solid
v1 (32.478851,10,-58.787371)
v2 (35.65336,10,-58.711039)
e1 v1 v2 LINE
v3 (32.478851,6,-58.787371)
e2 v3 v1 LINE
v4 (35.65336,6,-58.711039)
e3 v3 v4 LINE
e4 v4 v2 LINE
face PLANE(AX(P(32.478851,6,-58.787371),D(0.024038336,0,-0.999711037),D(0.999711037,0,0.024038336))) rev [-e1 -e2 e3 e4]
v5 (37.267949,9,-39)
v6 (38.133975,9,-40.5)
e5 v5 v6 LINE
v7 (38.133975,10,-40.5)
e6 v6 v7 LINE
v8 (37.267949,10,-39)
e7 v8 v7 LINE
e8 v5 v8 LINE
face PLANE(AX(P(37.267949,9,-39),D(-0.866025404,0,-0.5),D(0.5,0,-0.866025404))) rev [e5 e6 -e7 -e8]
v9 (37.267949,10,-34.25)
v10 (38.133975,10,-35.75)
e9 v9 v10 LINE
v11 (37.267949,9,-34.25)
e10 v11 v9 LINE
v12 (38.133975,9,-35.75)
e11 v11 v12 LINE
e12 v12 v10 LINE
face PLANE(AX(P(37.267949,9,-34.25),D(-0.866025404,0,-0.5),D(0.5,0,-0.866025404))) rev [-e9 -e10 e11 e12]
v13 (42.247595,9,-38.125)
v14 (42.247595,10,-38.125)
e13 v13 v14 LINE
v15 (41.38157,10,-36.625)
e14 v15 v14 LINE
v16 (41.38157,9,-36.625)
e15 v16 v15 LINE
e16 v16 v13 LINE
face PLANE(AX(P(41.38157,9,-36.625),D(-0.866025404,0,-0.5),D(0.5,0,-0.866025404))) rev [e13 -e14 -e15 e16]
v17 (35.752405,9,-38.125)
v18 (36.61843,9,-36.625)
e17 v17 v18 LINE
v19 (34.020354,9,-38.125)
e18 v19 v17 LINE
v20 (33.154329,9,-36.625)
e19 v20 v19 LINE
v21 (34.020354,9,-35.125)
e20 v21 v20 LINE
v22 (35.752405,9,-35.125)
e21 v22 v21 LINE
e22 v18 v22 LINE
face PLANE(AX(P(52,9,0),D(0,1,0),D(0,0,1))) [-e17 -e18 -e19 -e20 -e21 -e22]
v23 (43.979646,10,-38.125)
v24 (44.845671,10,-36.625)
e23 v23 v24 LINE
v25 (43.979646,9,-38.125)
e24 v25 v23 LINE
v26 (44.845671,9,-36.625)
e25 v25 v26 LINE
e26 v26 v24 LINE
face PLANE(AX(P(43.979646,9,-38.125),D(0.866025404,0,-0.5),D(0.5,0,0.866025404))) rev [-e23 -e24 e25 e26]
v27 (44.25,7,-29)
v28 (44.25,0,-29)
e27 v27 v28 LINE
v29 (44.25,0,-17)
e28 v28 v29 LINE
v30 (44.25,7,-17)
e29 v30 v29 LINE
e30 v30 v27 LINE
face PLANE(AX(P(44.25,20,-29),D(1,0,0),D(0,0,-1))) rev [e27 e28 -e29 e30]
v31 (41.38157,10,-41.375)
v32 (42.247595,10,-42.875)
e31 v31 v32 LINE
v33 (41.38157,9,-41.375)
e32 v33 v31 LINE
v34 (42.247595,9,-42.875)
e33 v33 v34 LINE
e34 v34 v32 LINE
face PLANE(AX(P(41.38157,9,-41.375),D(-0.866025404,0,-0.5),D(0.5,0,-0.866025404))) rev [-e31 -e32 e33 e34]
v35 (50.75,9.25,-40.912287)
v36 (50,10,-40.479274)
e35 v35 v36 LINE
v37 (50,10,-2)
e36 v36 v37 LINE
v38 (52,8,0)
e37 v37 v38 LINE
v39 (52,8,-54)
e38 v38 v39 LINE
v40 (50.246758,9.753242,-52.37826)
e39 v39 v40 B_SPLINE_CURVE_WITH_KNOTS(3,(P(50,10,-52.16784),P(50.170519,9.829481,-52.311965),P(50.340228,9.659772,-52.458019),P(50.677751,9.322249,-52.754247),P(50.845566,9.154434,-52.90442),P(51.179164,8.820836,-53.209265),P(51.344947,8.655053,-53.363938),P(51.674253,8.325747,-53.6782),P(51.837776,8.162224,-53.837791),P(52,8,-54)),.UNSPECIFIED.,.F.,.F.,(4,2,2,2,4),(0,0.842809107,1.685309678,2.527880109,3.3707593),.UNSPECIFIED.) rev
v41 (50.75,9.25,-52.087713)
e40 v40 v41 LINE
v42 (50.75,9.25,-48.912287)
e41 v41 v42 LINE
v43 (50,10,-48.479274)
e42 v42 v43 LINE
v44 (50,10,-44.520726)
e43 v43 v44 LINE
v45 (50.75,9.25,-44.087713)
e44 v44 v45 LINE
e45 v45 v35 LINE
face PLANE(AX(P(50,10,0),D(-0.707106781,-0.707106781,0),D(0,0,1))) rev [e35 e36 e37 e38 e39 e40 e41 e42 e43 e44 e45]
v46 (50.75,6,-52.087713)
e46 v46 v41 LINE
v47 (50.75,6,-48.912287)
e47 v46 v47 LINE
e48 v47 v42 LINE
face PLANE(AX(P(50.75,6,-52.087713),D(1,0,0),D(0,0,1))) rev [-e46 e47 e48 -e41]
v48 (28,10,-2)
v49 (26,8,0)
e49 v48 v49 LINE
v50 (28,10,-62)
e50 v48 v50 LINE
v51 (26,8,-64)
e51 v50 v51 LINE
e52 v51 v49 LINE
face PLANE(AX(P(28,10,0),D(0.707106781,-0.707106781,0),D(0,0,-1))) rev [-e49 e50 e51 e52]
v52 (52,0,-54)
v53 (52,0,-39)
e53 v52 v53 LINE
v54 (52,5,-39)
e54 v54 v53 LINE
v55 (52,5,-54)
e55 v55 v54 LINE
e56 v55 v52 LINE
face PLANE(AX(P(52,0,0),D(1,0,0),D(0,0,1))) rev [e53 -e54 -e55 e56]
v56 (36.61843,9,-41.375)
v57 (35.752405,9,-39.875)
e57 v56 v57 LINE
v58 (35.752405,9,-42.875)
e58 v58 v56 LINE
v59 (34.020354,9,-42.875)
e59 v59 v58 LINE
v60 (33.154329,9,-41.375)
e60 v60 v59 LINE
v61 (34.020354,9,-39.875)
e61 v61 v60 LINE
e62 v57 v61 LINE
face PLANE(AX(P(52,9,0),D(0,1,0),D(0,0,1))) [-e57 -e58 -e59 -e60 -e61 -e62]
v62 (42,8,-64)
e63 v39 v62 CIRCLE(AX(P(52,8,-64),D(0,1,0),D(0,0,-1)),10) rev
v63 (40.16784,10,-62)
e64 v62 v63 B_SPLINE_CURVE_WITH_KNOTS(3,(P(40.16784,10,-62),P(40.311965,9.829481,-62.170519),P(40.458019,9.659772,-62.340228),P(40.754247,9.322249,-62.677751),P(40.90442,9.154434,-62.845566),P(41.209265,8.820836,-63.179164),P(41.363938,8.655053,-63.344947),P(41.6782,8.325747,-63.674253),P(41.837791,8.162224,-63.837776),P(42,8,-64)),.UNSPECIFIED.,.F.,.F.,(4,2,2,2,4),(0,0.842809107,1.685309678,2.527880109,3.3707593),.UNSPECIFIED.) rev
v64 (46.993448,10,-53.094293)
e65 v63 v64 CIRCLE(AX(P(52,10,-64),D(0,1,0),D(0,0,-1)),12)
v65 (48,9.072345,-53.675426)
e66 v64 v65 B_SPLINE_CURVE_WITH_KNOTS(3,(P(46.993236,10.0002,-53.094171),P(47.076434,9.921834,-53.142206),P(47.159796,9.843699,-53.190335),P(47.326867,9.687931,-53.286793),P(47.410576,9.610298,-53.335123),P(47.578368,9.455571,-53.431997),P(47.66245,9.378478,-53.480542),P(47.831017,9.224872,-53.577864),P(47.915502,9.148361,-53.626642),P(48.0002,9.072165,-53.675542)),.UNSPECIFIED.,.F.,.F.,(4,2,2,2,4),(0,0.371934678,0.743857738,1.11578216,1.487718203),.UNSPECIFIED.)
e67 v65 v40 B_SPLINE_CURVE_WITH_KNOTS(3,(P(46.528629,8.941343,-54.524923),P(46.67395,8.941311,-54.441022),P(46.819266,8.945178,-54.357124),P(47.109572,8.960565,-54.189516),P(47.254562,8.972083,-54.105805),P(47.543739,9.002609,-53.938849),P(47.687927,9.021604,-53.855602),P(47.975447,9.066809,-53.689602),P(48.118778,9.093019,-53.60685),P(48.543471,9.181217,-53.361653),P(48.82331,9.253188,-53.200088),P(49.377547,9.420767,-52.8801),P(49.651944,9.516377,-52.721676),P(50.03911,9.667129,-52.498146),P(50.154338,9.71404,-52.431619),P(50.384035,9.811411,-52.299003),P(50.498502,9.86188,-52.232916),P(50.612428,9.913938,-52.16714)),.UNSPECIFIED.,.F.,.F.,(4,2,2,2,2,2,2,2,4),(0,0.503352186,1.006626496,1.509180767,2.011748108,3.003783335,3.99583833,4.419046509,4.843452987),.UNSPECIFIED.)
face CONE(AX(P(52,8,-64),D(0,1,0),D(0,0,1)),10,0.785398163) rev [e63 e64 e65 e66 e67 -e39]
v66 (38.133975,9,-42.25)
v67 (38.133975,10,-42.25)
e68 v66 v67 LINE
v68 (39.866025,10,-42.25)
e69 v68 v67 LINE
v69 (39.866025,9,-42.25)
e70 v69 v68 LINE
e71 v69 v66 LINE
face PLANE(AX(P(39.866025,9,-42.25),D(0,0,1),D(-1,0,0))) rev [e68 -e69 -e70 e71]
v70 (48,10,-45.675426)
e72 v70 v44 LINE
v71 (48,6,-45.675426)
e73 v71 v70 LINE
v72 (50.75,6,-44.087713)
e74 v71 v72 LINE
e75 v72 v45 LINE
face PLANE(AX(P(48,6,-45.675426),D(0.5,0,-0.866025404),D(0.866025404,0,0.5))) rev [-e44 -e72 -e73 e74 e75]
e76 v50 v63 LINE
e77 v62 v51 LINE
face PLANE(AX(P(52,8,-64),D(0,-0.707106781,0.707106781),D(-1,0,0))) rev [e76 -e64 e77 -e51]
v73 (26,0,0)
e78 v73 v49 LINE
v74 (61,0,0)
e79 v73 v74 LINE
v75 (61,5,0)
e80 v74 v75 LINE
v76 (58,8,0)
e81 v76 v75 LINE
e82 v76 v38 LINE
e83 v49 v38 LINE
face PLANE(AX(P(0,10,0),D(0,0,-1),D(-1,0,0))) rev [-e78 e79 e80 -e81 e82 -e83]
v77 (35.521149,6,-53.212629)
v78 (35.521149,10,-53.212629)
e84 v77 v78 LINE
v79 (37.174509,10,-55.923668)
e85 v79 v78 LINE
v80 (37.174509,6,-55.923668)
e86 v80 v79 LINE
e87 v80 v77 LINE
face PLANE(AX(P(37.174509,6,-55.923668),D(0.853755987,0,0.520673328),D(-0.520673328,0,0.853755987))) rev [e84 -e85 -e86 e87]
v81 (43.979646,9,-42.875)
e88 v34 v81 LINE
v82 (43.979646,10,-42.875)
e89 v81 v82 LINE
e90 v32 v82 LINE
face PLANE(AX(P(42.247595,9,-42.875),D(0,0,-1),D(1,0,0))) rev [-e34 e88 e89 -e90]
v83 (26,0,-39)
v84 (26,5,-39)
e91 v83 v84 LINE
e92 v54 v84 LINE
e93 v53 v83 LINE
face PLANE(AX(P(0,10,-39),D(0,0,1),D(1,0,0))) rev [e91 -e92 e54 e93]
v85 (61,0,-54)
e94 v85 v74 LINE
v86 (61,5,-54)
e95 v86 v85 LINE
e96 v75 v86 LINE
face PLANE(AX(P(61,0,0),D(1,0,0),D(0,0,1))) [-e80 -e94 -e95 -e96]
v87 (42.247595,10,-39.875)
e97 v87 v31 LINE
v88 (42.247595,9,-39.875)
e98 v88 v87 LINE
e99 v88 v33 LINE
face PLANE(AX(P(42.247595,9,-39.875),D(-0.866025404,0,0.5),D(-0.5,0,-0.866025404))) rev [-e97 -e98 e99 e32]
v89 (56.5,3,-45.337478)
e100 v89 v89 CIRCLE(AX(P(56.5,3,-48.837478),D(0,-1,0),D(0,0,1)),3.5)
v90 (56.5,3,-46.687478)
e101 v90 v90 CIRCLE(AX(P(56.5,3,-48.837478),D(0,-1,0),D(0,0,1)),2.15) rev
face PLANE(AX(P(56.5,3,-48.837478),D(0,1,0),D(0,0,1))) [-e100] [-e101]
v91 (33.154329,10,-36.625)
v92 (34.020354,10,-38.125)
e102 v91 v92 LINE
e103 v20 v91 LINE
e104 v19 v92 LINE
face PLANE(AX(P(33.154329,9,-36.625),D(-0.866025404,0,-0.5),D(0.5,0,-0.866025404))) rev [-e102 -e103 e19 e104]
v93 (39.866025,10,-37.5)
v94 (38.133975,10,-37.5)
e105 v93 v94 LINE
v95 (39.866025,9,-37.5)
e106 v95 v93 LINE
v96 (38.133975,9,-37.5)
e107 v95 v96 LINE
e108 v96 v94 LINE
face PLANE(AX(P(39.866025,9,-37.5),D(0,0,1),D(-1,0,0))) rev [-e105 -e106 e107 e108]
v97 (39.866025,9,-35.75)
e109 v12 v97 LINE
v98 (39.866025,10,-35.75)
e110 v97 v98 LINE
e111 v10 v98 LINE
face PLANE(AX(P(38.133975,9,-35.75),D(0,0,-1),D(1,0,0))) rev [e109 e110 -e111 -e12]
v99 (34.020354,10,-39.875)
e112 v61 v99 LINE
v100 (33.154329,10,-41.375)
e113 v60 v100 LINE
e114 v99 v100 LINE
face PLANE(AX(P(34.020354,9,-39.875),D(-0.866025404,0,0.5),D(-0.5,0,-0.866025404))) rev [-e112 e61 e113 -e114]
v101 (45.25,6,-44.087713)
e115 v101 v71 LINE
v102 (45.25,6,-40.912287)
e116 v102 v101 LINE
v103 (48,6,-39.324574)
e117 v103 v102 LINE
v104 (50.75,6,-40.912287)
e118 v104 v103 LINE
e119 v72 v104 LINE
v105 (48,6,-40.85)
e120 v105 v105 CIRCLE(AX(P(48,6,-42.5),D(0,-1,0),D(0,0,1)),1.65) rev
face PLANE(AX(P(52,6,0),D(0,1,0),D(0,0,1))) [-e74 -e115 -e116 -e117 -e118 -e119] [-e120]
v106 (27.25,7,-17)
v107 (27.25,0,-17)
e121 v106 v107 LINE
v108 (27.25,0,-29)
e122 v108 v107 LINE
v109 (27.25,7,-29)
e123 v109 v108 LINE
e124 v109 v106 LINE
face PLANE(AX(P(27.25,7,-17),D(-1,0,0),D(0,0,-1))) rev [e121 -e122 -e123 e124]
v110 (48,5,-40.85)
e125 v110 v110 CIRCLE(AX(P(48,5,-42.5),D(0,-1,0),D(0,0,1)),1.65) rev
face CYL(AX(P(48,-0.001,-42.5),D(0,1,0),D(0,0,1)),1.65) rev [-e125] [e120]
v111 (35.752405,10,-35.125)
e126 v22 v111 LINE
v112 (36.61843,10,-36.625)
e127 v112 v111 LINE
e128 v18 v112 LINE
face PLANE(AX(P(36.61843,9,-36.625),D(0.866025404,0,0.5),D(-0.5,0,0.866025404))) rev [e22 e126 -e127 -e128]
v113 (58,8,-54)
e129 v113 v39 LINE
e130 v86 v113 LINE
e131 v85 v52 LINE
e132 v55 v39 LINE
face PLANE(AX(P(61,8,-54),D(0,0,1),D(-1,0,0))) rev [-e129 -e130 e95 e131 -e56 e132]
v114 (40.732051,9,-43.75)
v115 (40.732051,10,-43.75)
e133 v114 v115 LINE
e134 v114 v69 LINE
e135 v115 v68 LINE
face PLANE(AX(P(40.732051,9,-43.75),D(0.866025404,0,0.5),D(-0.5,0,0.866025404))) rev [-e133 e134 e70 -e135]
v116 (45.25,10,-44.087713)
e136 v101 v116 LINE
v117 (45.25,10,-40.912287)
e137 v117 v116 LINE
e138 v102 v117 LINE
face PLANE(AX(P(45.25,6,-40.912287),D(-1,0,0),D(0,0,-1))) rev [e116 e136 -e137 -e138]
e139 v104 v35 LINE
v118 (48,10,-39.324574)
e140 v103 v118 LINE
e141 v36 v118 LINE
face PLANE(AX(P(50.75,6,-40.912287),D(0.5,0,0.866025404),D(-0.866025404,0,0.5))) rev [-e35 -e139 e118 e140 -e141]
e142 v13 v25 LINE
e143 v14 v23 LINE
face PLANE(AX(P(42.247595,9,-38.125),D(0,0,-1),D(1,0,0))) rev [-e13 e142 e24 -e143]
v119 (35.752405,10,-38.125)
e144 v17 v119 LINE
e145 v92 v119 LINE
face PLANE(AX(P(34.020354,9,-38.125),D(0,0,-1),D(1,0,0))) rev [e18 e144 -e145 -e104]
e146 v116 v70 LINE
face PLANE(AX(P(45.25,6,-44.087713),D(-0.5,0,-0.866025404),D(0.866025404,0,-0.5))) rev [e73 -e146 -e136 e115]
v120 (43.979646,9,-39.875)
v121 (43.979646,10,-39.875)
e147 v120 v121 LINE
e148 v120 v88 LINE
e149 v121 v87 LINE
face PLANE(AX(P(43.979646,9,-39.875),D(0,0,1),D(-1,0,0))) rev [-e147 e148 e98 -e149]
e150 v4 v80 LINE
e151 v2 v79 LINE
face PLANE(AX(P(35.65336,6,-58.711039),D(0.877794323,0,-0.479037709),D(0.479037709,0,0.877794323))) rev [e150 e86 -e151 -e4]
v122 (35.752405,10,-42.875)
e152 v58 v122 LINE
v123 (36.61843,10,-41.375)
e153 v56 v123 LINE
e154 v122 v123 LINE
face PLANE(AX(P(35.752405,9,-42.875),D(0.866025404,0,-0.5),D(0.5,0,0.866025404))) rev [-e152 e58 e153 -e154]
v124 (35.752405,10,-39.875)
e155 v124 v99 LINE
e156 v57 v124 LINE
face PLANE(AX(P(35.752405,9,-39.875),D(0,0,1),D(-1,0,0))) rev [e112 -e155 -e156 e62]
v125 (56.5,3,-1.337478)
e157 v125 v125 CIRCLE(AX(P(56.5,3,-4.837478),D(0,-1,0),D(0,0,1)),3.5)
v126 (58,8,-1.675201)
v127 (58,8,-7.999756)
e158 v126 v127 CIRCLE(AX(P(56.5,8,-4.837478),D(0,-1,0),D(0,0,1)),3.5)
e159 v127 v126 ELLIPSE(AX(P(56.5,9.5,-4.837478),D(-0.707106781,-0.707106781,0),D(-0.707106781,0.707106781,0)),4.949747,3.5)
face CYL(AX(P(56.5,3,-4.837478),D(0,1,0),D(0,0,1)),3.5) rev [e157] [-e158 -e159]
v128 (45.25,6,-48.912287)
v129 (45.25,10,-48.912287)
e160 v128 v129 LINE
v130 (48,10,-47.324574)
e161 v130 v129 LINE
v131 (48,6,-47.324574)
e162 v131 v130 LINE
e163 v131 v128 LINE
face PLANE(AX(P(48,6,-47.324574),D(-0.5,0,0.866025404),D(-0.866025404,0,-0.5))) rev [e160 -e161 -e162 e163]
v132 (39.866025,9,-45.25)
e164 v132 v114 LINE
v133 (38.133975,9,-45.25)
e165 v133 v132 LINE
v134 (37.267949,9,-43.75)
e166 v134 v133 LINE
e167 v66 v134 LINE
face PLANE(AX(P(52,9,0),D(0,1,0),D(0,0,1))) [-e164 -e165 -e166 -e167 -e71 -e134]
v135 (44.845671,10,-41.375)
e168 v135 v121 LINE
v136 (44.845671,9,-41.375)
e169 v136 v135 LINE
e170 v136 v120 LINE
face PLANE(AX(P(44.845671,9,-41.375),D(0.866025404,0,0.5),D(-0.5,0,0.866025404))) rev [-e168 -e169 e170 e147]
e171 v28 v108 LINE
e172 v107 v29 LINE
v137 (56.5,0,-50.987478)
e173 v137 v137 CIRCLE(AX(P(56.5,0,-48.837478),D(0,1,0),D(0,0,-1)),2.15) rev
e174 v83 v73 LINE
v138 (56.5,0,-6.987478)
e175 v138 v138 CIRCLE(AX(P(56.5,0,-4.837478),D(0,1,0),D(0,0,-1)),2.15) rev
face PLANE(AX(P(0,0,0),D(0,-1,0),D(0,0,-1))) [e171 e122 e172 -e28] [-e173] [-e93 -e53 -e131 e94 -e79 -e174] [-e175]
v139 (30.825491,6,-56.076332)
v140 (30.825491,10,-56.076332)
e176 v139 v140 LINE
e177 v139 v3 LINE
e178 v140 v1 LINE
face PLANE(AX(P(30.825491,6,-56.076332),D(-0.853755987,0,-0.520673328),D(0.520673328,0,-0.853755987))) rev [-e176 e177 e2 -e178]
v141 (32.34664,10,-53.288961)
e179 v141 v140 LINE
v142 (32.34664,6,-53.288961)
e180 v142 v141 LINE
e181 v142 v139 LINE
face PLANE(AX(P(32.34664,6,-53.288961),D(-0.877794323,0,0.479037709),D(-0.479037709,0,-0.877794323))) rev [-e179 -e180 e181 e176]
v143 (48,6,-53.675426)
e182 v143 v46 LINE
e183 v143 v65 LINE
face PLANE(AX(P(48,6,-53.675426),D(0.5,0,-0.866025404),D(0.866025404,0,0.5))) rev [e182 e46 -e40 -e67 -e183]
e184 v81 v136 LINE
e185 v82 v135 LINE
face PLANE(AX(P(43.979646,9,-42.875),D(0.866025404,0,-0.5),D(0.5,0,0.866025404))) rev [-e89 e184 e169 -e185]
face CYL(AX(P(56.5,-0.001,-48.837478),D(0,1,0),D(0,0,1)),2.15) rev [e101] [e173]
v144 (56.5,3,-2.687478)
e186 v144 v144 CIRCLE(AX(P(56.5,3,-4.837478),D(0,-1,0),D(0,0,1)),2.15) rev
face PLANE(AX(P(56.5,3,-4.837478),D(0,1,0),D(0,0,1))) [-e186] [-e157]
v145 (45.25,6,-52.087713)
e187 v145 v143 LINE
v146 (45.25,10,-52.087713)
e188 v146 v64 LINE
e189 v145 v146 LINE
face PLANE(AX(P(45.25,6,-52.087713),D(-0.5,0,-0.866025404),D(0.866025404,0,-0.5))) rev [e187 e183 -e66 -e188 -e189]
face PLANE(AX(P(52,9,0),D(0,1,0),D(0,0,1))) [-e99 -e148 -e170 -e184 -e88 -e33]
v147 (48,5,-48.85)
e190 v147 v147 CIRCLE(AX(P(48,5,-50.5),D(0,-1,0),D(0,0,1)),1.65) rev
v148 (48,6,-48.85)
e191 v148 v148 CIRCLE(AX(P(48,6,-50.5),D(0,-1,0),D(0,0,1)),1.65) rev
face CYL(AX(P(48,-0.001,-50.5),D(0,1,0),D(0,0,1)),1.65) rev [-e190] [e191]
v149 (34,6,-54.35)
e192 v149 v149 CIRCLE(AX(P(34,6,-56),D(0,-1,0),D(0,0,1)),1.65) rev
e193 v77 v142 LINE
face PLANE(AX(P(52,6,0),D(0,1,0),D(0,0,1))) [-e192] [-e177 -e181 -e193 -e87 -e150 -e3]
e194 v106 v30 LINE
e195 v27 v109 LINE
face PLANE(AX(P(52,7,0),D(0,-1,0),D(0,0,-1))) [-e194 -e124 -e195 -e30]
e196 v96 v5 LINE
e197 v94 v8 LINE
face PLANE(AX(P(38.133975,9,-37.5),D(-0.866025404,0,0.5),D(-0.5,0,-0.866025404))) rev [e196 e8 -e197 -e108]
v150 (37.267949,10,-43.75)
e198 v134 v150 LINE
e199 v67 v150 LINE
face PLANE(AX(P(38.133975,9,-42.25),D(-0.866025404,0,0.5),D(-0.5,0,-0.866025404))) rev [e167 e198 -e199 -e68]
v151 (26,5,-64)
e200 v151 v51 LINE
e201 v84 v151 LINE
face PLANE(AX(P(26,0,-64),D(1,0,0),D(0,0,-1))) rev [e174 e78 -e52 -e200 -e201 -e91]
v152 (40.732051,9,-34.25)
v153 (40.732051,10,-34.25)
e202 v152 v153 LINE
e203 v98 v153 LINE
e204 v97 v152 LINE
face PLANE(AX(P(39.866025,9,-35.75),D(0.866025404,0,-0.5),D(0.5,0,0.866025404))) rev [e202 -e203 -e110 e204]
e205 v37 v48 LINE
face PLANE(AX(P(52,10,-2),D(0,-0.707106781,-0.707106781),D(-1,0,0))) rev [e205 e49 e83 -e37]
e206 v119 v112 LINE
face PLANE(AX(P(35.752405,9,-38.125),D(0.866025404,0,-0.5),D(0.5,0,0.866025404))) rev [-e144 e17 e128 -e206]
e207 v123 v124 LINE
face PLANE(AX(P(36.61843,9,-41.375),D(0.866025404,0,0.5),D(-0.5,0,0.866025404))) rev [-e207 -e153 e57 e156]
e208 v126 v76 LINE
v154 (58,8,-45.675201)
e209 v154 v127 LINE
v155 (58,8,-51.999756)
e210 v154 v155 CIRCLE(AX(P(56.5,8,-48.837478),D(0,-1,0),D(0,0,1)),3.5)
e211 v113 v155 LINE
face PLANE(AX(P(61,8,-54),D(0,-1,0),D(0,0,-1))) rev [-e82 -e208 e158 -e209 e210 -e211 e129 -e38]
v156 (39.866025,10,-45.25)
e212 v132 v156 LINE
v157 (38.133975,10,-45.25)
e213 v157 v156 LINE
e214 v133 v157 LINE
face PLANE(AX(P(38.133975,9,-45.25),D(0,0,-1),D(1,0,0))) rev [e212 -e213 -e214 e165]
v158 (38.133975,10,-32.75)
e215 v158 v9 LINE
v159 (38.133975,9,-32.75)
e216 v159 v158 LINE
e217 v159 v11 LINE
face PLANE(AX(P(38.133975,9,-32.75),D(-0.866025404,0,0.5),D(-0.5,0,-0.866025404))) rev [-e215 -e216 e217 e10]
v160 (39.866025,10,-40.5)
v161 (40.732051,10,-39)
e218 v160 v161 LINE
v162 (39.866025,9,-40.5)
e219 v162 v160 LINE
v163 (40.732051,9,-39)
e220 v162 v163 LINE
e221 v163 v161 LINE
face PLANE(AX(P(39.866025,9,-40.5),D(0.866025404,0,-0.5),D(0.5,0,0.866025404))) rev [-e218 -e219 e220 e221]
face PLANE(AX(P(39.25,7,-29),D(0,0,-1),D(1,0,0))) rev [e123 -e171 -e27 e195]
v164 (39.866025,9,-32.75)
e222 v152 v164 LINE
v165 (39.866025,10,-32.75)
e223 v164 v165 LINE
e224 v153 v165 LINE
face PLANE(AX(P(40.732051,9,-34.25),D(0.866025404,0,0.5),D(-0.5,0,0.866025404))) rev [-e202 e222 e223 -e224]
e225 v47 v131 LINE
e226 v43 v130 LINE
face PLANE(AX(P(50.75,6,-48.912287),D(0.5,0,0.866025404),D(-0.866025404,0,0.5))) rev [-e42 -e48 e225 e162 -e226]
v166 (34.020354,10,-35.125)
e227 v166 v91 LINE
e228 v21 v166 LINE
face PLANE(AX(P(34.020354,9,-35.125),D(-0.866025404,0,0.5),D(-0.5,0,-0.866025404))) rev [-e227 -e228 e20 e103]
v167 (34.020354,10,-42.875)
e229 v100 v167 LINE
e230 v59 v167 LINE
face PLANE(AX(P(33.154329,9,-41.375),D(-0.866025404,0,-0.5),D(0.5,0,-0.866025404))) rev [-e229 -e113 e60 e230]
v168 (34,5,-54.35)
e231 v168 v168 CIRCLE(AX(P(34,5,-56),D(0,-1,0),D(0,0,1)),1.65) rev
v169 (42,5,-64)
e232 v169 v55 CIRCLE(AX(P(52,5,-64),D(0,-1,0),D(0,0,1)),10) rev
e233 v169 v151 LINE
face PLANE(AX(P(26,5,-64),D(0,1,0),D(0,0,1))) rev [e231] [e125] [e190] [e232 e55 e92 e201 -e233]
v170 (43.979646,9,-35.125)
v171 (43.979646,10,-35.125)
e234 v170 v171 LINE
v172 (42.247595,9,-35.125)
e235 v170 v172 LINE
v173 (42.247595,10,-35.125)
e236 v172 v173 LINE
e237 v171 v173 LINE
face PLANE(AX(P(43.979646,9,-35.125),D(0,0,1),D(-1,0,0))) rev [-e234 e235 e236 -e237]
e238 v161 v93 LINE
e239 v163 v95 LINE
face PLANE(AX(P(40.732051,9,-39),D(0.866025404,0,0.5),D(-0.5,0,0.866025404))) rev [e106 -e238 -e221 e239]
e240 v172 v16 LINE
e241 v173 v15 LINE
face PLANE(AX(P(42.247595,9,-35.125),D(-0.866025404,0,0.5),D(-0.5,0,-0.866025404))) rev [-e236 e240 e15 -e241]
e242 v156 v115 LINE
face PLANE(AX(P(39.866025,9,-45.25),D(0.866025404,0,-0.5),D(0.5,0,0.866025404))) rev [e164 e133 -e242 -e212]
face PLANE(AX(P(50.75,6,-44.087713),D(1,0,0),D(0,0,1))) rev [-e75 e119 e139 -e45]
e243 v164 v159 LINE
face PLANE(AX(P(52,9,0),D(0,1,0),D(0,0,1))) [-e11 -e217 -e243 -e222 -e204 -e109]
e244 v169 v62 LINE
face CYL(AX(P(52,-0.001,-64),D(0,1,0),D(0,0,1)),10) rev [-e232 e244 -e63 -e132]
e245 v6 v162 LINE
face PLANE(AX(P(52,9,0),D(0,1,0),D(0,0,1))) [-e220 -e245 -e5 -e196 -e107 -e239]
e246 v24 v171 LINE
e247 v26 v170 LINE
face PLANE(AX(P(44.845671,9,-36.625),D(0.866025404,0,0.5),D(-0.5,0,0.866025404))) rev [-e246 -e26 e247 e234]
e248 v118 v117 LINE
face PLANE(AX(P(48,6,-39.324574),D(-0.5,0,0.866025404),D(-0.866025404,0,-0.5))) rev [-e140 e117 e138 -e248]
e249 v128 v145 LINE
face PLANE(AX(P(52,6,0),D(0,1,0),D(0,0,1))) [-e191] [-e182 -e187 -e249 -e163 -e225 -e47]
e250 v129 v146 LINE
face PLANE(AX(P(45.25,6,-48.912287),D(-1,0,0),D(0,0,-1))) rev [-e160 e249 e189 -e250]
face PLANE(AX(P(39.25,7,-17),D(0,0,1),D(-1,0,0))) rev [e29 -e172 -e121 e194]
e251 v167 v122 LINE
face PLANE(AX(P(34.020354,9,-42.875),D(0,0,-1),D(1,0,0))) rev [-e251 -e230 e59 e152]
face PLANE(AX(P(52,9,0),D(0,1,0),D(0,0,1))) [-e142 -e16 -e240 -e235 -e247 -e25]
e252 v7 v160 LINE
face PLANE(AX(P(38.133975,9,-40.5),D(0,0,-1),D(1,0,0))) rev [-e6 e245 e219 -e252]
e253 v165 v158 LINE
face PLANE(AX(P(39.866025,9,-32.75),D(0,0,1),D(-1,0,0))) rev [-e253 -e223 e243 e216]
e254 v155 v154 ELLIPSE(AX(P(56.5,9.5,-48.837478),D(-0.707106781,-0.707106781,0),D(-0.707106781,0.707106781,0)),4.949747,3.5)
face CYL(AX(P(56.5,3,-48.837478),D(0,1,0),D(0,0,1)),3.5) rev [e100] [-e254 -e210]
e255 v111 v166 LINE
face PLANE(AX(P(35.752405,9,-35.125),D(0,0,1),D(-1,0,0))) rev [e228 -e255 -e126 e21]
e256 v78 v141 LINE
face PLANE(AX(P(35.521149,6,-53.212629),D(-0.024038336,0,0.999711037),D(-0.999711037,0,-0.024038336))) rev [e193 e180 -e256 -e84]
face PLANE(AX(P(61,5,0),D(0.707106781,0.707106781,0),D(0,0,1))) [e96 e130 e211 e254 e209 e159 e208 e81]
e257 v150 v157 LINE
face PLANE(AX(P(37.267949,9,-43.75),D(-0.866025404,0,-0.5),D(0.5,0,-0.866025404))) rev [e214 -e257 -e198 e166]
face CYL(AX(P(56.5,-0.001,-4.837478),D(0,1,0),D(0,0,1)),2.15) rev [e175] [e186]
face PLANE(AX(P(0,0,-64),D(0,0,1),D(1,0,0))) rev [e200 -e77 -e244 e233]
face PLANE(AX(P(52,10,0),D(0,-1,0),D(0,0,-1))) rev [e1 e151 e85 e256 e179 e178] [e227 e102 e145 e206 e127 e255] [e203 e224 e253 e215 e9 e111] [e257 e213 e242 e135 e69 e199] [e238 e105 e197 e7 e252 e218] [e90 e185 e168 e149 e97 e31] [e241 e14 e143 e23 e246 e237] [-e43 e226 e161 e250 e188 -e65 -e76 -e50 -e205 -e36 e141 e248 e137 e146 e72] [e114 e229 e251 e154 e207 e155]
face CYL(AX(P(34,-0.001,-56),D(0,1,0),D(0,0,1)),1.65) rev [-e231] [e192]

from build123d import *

# Parameters (mm, degrees)
SKETCH1_W           = 26
SKETCH1_H           = 39
BOSS_EXTRUDE1_DEPTH = 10
SKETCH2_W           = 26
SKETCH2_H           = 5
BOSS_EXTRUDE2_DEPTH = 25
CUT_EXTRUDE1_REACH  = 71.8
CHAMFER1_SIZE       = 2
SKETCH4_W           = 54
SKETCH4_H           = 8
BOSS_EXTRUDE3_DEPTH = 9
CUT_EXTRUDE2_REACH  = 71.541
SKETCH5_R           = 2.15
SKETCH6_R           = 3.5
CUT_EXTRUDE3_DEPTH  = 5
CHAMFER3_SIZE       = 3
CUT_EXTRUDE5_DEPTH  = 1
CUT_EXTRUDE6_DEPTH  = 4
CUT_EXTRUDE7_REACH  = 71.8
SKETCH12_R          = 1.65
SKETCH14_W          = 12
SKETCH14_H          = 12
CUT_EXTRUDE9_DEPTH  = 7
SKETCH15_W          = 37.46707609
SKETCH15_H          = 12.719450185
CUT_EXTRUDE10_DEPTH = 89.977525252
SKETCH16_W          = 5
SKETCH16_H          = 12
CUT_EXTRUDE11_DEPTH = 7


with BuildPart() as part:
    # Sketch1 → Boss-Extrude1 (new body)
    with BuildSketch(Plane(origin=(0, 0, 0), x_dir=(1, 0, 0), z_dir=(0, 1, 0))):
        with Locations((13, 19.5)):
            Rectangle(SKETCH1_W, SKETCH1_H)
    extrude(amount=BOSS_EXTRUDE1_DEPTH)

    # Sketch2 → Boss-Extrude2 (add)
    with BuildSketch(Plane(origin=(0, 0, -39), x_dir=(-1, 0, 0), z_dir=(0, 0, -1))):
        with Locations((-13, 7.5)):
            Rectangle(SKETCH2_W, SKETCH2_H)
    extrude(amount=BOSS_EXTRUDE2_DEPTH)

    # Sketch3 → Cut-Extrude1 (cut, up to next)
    with BuildSketch(Plane(origin=(0, 10, 0), x_dir=(1, 0, 0), z_dir=(0, 1, 0)), mode=Mode.PRIVATE) as cut_extrude1_sk1:
        with BuildLine():
            Line((0, 54), (0, 64))
            Line((0, 64), (10, 64))
            ThreePointArc((10, 64), (7.071067812, 56.928932188), (0, 54))
        make_face()
    cut_extrude1_tool1 = extrude(cut_extrude1_sk1.sketch, amount=-CUT_EXTRUDE1_REACH, mode=Mode.PRIVATE) & part.part
    add(cut_extrude1_tool1.solids().sort_by_distance((4.244132, 10, -59.755868))[0], mode=Mode.SUBTRACT)

    # Chamfer1
    chamfer1_edges = [part.edges().sort_by_distance(p)[0] for p in [
        (26, 10, -32),
        (18, 10, -64),
        (0, 10, -27),
        (7.071067812, 10, -56.928932188),
        (13, 10, 0),
    ]]
    chamfer(chamfer1_edges, length=CHAMFER1_SIZE)

    # Sketch4 → Boss-Extrude3 (add)
    with BuildSketch(Plane.ZY):
        with Locations((-27, 4)):
            Rectangle(SKETCH4_W, SKETCH4_H)
    extrude(amount=BOSS_EXTRUDE3_DEPTH)

    # Sketch5 → Cut-Extrude2 (cut, up to next)
    with BuildSketch(Plane(origin=(0, 8, 0), x_dir=(1, 0, 0), z_dir=(0, 1, 0)), mode=Mode.PRIVATE) as cut_extrude2_sk1:
        with Locations(Location((-4.5, 48.837478231, 0), (0, 0, 270))):
            Circle(SKETCH5_R)
    cut_extrude2_tool1 = extrude(cut_extrude2_sk1.sketch, amount=-CUT_EXTRUDE2_REACH, mode=Mode.PRIVATE) & part.part
    # Sketch5 → Cut-Extrude2 (cut, up to next)
    with BuildSketch(Plane(origin=(0, 8, 0), x_dir=(1, 0, 0), z_dir=(0, 1, 0)), mode=Mode.PRIVATE) as cut_extrude2_sk2:
        with Locations(Location((-4.5, 4.837478231, 0), (0, 0, 270))):
            Circle(SKETCH5_R)
    cut_extrude2_tool2 = extrude(cut_extrude2_sk2.sketch, amount=-CUT_EXTRUDE2_REACH, mode=Mode.PRIVATE) & part.part
    add(cut_extrude2_tool1.solids().sort_by_distance((-4.5, 8, -48.837478))[0], mode=Mode.SUBTRACT)
    add(cut_extrude2_tool2.solids().sort_by_distance((-4.5, 8, -4.837478))[0], mode=Mode.SUBTRACT)

    # Sketch6 → Cut-Extrude3 (cut)
    with BuildSketch(Plane(origin=(0, 8, 0), x_dir=(1, 0, 0), z_dir=(0, 1, 0))):
        with Locations(Location((-4.5, 48.837478231, 0), (0, 0, 270))):
            Circle(SKETCH6_R)
        with Locations(Location((-4.5, 4.837478231, 0), (0, 0, 270))):
            Circle(SKETCH6_R)
    extrude(amount=-CUT_EXTRUDE3_DEPTH, mode=Mode.SUBTRACT)

    # Chamfer3
    # the kernel refuses this chamfer: 3 mm, written as the material it takes off along each edge
    with BuildSketch(Plane(origin=(-9, 8, -61.715048964), x_dir=(-0.0274958766105862, -0.9996219169112968, 0), z_dir=(0, 0, 1))) as chamfer3_piece_1:
        Polygon((CHAMFER3_SIZE * 0.999621916911, CHAMFER3_SIZE * 0.0274958766106), (-CHAMFER3_SIZE * 0.0274958766106, CHAMFER3_SIZE * 0.999621916911), (0, 0), align=None)
    extrude(amount=69.430097928, mode=Mode.SUBTRACT)

    # Sketch10 → Cut-Extrude5 (cut)
    with BuildSketch(Plane(origin=(0, 10, 0), x_dir=(1, 0, 0), z_dir=(0, 1, 0))):
        Polygon((14.732050808, 39), (13.866025404, 40.5), (12.133974596, 40.5), (11.267949192, 39), (12.133974596, 37.5), (13.866025404, 37.5), align=None)
        Polygon((14.732050808, 43.75), (13.866025404, 45.25), (12.133974596, 45.25), (11.267949192, 43.75), (12.133974596, 42.25), (13.866025404, 42.25), align=None)
        Polygon((17.979646072, 39.875), (18.845671476, 41.375), (17.979646072, 42.875), (16.247595264, 42.875), (15.38156986, 41.375), (16.247595264, 39.875), align=None)
        Polygon((16.247595264, 35.125), (17.979646072, 35.125), (18.845671476, 36.625), (17.979646072, 38.125), (16.247595264, 38.125), (15.38156986, 36.625), align=None)
        Polygon((11.267949192, 34.25), (12.133974596, 32.75), (13.866025404, 32.75), (14.732050808, 34.25), (13.866025404, 35.75), (12.133974596, 35.75), align=None)
        Polygon((8.020353928, 38.125), (7.154328524, 36.625), (8.020353928, 35.125), (9.752404736, 35.125), (10.61843014, 36.625), (9.752404736, 38.125), align=None)
        Polygon((9.752404736, 42.875), (8.020353928, 42.875), (7.154328524, 41.375), (8.020353928, 39.875), (9.752404736, 39.875), (10.61843014, 41.375), align=None)
    extrude(amount=-CUT_EXTRUDE5_DEPTH, mode=Mode.SUBTRACT)

    # Sketch11 → Cut-Extrude6 (cut)
    with BuildSketch(Plane(origin=(0, 10, 0), x_dir=(1, 0, 0), z_dir=(0, 1, 0))):
        Polygon((6.75, 44.08771324), (4, 45.675426481), (1.25, 44.08771324), (1.25, 40.91228676), (4, 39.324573519), (6.75, 40.91228676), align=None)
        Polygon((6.75, 52.08771324), (4, 53.675426481), (1.25, 52.08771324), (1.25, 48.91228676), (4, 47.324573519), (6.75, 48.91228676), align=None)
        Polygon((21.174508901, 56.076331968), (19.521149027, 58.787371337), (16.346640126, 58.711039369), (14.825491099, 55.923668032), (16.478850973, 53.212628663), (19.653359874, 53.288960631), align=None)
    extrude(amount=-CUT_EXTRUDE6_DEPTH, mode=Mode.SUBTRACT)

    # Sketch12 → Cut-Extrude7 (cut, up to next)
    with BuildSketch(Plane(origin=(0, 10, 0), x_dir=(1, 0, 0), z_dir=(0, 1, 0)), mode=Mode.PRIVATE) as cut_extrude7_sk1:
        with Locations(Location((4, 50.5, 0), (0, 0, 270))):
            Circle(SKETCH12_R)
    cut_extrude7_tool1 = extrude(cut_extrude7_sk1.sketch, amount=-CUT_EXTRUDE7_REACH, mode=Mode.PRIVATE) & part.part
    # Sketch12 → Cut-Extrude7 (cut, up to next)
    with BuildSketch(Plane(origin=(0, 10, 0), x_dir=(1, 0, 0), z_dir=(0, 1, 0)), mode=Mode.PRIVATE) as cut_extrude7_sk2:
        with Locations(Location((4, 42.5, 0), (0, 0, 270))):
            Circle(SKETCH12_R)
    cut_extrude7_tool2 = extrude(cut_extrude7_sk2.sketch, amount=-CUT_EXTRUDE7_REACH, mode=Mode.PRIVATE) & part.part
    # Sketch12 → Cut-Extrude7 (cut, up to next)
    with BuildSketch(Plane(origin=(0, 10, 0), x_dir=(1, 0, 0), z_dir=(0, 1, 0)), mode=Mode.PRIVATE) as cut_extrude7_sk3:
        with Locations(Location((18, 56, 0), (0, 0, 270))):
            Circle(SKETCH12_R)
    cut_extrude7_tool3 = extrude(cut_extrude7_sk3.sketch, amount=-CUT_EXTRUDE7_REACH, mode=Mode.PRIVATE) & part.part
    add(cut_extrude7_tool1.solids().sort_by_distance((4, 10, -50.5))[0], mode=Mode.SUBTRACT)
    add(cut_extrude7_tool2.solids().sort_by_distance((4, 10, -42.5))[0], mode=Mode.SUBTRACT)
    add(cut_extrude7_tool3.solids().sort_by_distance((18, 10, -56))[0], mode=Mode.SUBTRACT)

    # Sketch14 → Cut-Extrude9 (cut)
    with BuildSketch(Plane.XZ):
        with Locations((18.75, -23)):
            Rectangle(SKETCH14_W, SKETCH14_H)
    extrude(amount=-CUT_EXTRUDE9_DEPTH, mode=Mode.SUBTRACT)

    # Mirror3: part across plane


with BuildPart() as part_1:
    add(part.part)
    add(part.part.mirror(Plane(origin=(26, 0, 0), x_dir=(0, 0, 1), z_dir=(1, 0, 0))))

    # Sketch15 → Cut-Extrude10 (cut, through all)
    with BuildSketch(Plane.XY):
        with Locations((7.266461955, 6.359725093)):
            Rectangle(SKETCH15_W, SKETCH15_H)
    extrude(amount=-CUT_EXTRUDE10_DEPTH, mode=Mode.SUBTRACT)

    # Sketch16 → Cut-Extrude11 (cut)
    with BuildSketch(Plane.XZ):
        with Locations((41.75, -23)):
            Rectangle(SKETCH16_W, SKETCH16_H)
    extrude(amount=-CUT_EXTRUDE11_DEPTH, mode=Mode.SUBTRACT)


solid = part_1.part
